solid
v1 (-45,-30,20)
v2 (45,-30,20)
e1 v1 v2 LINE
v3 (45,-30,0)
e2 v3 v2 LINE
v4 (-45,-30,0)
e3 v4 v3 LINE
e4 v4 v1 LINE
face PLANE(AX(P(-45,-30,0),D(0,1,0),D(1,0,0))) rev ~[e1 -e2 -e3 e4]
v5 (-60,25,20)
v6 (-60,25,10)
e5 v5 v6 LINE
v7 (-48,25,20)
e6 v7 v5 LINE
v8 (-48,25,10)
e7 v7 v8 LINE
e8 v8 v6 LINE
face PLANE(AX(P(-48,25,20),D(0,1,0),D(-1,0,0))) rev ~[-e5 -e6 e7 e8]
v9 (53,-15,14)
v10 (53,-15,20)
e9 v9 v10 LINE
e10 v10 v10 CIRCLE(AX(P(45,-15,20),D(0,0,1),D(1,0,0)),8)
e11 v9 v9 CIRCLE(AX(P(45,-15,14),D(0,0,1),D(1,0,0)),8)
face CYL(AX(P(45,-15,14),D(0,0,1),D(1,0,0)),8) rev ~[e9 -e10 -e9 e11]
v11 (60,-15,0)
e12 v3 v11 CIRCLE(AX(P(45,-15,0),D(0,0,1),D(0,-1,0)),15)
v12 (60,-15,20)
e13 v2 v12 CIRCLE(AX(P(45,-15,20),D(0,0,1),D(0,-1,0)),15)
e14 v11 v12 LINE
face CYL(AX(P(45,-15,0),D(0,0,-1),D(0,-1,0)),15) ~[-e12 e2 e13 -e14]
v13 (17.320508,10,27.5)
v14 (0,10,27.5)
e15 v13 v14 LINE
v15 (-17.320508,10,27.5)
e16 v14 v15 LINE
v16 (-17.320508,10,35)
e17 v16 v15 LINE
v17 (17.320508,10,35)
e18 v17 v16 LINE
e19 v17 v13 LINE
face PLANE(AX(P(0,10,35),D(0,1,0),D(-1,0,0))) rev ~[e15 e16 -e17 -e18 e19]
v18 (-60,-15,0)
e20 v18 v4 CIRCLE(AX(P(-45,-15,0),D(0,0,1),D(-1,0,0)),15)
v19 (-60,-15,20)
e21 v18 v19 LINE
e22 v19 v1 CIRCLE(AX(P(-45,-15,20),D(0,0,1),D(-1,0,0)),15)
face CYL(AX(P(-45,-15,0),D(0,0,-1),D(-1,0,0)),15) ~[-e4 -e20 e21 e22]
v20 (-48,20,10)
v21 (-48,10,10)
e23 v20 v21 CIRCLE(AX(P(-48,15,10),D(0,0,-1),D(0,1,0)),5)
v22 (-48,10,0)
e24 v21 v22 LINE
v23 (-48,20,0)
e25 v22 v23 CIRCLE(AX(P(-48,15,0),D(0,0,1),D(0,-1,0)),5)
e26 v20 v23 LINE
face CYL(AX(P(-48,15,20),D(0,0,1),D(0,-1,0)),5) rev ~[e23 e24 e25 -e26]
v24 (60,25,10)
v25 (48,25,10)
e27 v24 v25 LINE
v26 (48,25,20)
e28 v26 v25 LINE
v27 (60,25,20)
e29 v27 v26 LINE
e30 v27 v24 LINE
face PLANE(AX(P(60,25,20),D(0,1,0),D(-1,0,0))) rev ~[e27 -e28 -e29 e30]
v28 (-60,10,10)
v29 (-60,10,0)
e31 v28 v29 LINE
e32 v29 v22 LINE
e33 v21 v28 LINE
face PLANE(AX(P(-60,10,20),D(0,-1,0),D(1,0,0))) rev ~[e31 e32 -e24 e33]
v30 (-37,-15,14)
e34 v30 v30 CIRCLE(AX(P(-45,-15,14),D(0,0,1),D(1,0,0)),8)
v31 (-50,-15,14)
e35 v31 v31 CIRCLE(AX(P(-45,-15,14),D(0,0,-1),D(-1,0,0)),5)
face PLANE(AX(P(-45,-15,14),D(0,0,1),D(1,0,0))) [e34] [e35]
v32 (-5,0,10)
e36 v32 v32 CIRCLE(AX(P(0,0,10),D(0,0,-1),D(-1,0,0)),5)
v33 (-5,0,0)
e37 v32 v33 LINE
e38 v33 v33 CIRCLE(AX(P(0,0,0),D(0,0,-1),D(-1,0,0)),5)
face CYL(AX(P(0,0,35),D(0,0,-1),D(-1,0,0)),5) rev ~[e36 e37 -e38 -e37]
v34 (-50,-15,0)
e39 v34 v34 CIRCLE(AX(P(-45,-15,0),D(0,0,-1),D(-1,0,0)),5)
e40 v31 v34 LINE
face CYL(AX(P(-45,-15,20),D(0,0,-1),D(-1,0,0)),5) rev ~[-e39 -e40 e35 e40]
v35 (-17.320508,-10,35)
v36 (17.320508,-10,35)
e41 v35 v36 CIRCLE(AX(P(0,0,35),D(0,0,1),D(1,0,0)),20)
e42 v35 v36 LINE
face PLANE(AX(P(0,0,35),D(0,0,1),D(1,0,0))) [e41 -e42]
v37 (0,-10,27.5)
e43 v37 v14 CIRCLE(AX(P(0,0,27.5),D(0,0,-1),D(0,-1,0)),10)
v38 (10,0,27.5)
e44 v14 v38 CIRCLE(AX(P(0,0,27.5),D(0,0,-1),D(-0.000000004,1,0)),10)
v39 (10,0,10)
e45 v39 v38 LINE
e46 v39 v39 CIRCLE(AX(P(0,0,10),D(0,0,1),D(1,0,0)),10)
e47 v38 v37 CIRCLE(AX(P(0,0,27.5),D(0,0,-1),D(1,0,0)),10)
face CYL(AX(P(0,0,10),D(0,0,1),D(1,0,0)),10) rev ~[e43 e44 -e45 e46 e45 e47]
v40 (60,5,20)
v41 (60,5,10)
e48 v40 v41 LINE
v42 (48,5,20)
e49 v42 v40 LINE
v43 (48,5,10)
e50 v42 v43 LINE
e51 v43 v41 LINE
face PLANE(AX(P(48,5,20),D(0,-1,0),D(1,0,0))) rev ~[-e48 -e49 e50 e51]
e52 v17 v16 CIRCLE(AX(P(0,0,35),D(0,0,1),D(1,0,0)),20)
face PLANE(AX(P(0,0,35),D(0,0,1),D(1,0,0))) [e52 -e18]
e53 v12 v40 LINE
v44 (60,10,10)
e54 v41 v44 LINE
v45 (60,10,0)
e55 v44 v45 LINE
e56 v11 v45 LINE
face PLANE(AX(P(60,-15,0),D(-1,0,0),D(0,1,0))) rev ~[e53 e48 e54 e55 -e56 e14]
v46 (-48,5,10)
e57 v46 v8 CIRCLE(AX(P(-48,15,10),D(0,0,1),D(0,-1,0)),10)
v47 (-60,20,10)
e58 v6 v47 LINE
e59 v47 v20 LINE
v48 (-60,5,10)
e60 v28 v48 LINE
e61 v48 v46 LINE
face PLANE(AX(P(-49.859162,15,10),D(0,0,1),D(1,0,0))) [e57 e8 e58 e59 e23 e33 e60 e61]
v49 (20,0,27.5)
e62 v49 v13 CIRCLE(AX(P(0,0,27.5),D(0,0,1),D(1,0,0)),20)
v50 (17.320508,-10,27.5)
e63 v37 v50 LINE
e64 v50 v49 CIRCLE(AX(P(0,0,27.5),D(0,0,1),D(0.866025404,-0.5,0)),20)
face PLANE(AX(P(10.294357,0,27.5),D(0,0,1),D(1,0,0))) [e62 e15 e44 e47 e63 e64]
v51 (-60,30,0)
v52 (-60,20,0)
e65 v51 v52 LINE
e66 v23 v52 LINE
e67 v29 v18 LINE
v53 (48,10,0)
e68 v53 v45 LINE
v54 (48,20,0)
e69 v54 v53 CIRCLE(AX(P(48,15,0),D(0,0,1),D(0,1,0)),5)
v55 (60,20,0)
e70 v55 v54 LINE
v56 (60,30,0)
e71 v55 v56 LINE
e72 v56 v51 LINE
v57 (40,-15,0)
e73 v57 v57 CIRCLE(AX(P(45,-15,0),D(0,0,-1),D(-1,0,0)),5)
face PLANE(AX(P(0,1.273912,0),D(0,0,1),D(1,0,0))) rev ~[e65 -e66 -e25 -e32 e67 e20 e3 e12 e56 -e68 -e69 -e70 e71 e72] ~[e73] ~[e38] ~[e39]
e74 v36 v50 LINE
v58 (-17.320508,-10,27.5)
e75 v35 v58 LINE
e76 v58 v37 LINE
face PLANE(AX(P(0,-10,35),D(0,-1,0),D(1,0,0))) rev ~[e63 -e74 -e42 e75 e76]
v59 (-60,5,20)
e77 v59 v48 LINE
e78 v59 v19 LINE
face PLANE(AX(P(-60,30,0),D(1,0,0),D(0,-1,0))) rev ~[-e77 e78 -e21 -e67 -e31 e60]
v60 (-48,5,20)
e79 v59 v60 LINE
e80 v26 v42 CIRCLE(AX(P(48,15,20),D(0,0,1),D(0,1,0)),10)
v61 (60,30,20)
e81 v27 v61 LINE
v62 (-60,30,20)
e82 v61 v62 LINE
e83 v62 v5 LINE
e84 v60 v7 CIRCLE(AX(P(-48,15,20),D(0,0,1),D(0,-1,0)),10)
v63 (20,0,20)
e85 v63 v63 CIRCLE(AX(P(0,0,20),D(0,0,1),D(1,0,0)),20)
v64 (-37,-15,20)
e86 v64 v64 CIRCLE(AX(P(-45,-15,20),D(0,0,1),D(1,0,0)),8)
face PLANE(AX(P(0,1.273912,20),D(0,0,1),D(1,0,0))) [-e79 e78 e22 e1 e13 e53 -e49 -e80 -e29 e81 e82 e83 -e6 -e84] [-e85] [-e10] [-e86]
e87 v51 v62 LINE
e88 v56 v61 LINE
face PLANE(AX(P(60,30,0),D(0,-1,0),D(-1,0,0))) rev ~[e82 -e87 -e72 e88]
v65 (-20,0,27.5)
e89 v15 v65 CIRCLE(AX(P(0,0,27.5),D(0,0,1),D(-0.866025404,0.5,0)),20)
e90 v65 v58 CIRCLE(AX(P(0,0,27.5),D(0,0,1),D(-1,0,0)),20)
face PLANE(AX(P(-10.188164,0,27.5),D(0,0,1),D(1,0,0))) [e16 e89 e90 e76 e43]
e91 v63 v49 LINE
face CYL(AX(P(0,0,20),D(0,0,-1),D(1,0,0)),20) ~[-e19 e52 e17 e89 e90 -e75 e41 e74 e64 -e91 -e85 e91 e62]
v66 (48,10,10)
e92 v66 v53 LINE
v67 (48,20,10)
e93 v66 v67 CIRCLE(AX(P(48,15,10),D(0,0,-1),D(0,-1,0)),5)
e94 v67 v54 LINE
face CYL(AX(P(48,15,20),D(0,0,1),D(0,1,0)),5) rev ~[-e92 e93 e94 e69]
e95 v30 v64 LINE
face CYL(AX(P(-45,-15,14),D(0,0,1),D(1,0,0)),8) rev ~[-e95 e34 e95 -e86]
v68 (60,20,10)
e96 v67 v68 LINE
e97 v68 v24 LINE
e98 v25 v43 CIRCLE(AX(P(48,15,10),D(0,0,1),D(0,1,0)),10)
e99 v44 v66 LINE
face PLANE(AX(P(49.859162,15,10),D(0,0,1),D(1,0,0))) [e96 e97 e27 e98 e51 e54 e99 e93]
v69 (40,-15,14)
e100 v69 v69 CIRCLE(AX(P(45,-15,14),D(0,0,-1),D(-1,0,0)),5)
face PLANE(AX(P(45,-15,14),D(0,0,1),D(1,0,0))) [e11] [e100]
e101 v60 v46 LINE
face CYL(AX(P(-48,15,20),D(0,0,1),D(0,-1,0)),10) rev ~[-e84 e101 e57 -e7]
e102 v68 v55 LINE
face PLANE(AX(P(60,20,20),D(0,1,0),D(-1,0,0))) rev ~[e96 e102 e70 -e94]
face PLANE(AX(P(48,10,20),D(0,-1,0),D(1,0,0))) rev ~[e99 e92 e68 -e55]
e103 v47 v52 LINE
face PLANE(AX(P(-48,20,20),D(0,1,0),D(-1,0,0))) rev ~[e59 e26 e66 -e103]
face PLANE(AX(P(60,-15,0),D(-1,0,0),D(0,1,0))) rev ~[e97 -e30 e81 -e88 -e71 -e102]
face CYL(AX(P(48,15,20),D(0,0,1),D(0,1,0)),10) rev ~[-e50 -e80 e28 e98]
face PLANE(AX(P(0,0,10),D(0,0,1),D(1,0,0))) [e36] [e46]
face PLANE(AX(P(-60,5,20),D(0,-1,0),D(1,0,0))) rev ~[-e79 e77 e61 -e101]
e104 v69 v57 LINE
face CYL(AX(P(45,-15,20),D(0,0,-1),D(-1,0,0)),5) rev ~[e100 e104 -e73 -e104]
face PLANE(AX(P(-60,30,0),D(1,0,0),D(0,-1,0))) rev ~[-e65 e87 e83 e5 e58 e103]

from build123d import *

# Parameters (mm, degrees)
F1_DEPTH        = 20
F2_R            = 20
F3_DEPTH        = 15
F6_DEPTH        = 20.001
F7_DEPTH        = 10
F8_D            = 10
F8_CBORE_D      = 16
F8_CBORE_DEPTH  = 6
F10_D           = 10
F10_CBORE_D     = 20
F10_CBORE_DEPTH = 25
F12_DEPTH       = 7.5


# Not quite as in the source:
# - a feature names something its author has since deleted; it is built from what else it names


with BuildPart() as f1:
    # F0 (on Top) → F1 (new body)
    with BuildSketch(Plane.XY):
        with BuildLine():
            Line((60, 30), (-60, 30))
            Line((-60, 30), (-60, -15))
            ThreePointArc((-60, -15), (-55.6066017178, -25.6066017178), (-45, -30))
            Line((-45, -30), (45, -30))
            ThreePointArc((45, -30), (55.6066017178, -25.6066017178), (60, -15))
            Line((60, -15), (60, 30))
        make_face()
    extrude(amount=F1_DEPTH)

    # F2 (on face) → F3 (join)
    with BuildSketch(Plane.XY.offset(20)):
        Circle(F2_R)
    extrude(amount=F3_DEPTH)

    # F5 (on face) → F6 (cut, through all)
    with BuildSketch(Plane.XY.offset(20)):
        with BuildLine():
            Line((-60, 20), (-60, 10))
            Line((-60, 10), (-48, 10))
            ThreePointArc((-48, 10), (-43, 15), (-48, 20))
            Line((-48, 20), (-60, 20))
        make_face()
        with BuildLine():
            Line((60, 10), (60, 20))
            Line((60, 20), (48, 20))
            ThreePointArc((48, 20), (43, 15), (48, 10))
            Line((48, 10), (60, 10))
        make_face()
    extrude(amount=-F6_DEPTH, mode=Mode.SUBTRACT)

    # F5 (on face) → F7 (cut)
    with BuildSketch(Plane.XY.offset(20)):
        with BuildLine():
            Line((-60, 5), (-48, 5))
            ThreePointArc((-48, 5), (-38, 15), (-48, 25))
            Line((-48, 25), (-60, 25))
            Line((-60, 25), (-60, 20))
            Line((-60, 20), (-48, 20))
            ThreePointArc((-48, 20), (-43, 15), (-48, 10))
            Line((-48, 10), (-60, 10))
            Line((-60, 10), (-60, 5))
        make_face()
        with BuildLine():
            Line((60, 20), (60, 25))
            Line((60, 25), (48, 25))
            ThreePointArc((48, 25), (38, 15), (48, 5))
            Line((48, 5), (60, 5))
            Line((60, 5), (60, 10))
            Line((60, 10), (48, 10))
            ThreePointArc((48, 10), (43, 15), (48, 20))
            Line((48, 20), (60, 20))
        make_face()
    extrude(amount=-F7_DEPTH, mode=Mode.SUBTRACT)

    # F8 (through all)
    with Locations(Plane.XY.offset(20)):
        with Locations((-45, -15), (45, -15)):
            CounterBoreHole(F8_D / 2, F8_CBORE_D / 2, F8_CBORE_DEPTH)

    # F10 (through all)
    with Locations(Plane.XY.offset(35)):
        with Locations((0, 0)):
            CounterBoreHole(F10_D / 2, F10_CBORE_D / 2, F10_CBORE_DEPTH)

    # F11 (on face) → F12 (cut)
    with BuildSketch(Plane.XY.offset(35)):
        with BuildLine():
            Line((-3.73e-08, 10), (-17.3205080757, 10))
            ThreePointArc((-17.3205080757, 10), (-19.3185165265, 5.1763808994), (-20, -5.5e-09))
            ThreePointArc((-20, -5.5e-09), (-19.3185165251, -5.1763809047), (-17.3205080757, -10))
            Line((-17.3205080757, -10), (0, -10))
            ThreePointArc((0, -10), (-10, -1.87e-08), (-3.73e-08, 10))
        make_face()
        with BuildLine():
            Line((17.3205080757, 10), (-3.73e-08, 10))
            ThreePointArc((-3.73e-08, 10), (7.0710677987, 7.0710678251), (10, 0))
            ThreePointArc((10, 0), (7.0710678119, -7.0710678119), (0, -10))
            Line((0, -10), (17.3205080757, -10))
            ThreePointArc((17.3205080757, -10), (19.3185165258, -5.1763809021), (20, 0))
            ThreePointArc((20, 0), (19.3185165258, 5.1763809021), (17.3205080757, 10))
        make_face()
    extrude(amount=-F12_DEPTH, mode=Mode.SUBTRACT)


solid = f1.part
